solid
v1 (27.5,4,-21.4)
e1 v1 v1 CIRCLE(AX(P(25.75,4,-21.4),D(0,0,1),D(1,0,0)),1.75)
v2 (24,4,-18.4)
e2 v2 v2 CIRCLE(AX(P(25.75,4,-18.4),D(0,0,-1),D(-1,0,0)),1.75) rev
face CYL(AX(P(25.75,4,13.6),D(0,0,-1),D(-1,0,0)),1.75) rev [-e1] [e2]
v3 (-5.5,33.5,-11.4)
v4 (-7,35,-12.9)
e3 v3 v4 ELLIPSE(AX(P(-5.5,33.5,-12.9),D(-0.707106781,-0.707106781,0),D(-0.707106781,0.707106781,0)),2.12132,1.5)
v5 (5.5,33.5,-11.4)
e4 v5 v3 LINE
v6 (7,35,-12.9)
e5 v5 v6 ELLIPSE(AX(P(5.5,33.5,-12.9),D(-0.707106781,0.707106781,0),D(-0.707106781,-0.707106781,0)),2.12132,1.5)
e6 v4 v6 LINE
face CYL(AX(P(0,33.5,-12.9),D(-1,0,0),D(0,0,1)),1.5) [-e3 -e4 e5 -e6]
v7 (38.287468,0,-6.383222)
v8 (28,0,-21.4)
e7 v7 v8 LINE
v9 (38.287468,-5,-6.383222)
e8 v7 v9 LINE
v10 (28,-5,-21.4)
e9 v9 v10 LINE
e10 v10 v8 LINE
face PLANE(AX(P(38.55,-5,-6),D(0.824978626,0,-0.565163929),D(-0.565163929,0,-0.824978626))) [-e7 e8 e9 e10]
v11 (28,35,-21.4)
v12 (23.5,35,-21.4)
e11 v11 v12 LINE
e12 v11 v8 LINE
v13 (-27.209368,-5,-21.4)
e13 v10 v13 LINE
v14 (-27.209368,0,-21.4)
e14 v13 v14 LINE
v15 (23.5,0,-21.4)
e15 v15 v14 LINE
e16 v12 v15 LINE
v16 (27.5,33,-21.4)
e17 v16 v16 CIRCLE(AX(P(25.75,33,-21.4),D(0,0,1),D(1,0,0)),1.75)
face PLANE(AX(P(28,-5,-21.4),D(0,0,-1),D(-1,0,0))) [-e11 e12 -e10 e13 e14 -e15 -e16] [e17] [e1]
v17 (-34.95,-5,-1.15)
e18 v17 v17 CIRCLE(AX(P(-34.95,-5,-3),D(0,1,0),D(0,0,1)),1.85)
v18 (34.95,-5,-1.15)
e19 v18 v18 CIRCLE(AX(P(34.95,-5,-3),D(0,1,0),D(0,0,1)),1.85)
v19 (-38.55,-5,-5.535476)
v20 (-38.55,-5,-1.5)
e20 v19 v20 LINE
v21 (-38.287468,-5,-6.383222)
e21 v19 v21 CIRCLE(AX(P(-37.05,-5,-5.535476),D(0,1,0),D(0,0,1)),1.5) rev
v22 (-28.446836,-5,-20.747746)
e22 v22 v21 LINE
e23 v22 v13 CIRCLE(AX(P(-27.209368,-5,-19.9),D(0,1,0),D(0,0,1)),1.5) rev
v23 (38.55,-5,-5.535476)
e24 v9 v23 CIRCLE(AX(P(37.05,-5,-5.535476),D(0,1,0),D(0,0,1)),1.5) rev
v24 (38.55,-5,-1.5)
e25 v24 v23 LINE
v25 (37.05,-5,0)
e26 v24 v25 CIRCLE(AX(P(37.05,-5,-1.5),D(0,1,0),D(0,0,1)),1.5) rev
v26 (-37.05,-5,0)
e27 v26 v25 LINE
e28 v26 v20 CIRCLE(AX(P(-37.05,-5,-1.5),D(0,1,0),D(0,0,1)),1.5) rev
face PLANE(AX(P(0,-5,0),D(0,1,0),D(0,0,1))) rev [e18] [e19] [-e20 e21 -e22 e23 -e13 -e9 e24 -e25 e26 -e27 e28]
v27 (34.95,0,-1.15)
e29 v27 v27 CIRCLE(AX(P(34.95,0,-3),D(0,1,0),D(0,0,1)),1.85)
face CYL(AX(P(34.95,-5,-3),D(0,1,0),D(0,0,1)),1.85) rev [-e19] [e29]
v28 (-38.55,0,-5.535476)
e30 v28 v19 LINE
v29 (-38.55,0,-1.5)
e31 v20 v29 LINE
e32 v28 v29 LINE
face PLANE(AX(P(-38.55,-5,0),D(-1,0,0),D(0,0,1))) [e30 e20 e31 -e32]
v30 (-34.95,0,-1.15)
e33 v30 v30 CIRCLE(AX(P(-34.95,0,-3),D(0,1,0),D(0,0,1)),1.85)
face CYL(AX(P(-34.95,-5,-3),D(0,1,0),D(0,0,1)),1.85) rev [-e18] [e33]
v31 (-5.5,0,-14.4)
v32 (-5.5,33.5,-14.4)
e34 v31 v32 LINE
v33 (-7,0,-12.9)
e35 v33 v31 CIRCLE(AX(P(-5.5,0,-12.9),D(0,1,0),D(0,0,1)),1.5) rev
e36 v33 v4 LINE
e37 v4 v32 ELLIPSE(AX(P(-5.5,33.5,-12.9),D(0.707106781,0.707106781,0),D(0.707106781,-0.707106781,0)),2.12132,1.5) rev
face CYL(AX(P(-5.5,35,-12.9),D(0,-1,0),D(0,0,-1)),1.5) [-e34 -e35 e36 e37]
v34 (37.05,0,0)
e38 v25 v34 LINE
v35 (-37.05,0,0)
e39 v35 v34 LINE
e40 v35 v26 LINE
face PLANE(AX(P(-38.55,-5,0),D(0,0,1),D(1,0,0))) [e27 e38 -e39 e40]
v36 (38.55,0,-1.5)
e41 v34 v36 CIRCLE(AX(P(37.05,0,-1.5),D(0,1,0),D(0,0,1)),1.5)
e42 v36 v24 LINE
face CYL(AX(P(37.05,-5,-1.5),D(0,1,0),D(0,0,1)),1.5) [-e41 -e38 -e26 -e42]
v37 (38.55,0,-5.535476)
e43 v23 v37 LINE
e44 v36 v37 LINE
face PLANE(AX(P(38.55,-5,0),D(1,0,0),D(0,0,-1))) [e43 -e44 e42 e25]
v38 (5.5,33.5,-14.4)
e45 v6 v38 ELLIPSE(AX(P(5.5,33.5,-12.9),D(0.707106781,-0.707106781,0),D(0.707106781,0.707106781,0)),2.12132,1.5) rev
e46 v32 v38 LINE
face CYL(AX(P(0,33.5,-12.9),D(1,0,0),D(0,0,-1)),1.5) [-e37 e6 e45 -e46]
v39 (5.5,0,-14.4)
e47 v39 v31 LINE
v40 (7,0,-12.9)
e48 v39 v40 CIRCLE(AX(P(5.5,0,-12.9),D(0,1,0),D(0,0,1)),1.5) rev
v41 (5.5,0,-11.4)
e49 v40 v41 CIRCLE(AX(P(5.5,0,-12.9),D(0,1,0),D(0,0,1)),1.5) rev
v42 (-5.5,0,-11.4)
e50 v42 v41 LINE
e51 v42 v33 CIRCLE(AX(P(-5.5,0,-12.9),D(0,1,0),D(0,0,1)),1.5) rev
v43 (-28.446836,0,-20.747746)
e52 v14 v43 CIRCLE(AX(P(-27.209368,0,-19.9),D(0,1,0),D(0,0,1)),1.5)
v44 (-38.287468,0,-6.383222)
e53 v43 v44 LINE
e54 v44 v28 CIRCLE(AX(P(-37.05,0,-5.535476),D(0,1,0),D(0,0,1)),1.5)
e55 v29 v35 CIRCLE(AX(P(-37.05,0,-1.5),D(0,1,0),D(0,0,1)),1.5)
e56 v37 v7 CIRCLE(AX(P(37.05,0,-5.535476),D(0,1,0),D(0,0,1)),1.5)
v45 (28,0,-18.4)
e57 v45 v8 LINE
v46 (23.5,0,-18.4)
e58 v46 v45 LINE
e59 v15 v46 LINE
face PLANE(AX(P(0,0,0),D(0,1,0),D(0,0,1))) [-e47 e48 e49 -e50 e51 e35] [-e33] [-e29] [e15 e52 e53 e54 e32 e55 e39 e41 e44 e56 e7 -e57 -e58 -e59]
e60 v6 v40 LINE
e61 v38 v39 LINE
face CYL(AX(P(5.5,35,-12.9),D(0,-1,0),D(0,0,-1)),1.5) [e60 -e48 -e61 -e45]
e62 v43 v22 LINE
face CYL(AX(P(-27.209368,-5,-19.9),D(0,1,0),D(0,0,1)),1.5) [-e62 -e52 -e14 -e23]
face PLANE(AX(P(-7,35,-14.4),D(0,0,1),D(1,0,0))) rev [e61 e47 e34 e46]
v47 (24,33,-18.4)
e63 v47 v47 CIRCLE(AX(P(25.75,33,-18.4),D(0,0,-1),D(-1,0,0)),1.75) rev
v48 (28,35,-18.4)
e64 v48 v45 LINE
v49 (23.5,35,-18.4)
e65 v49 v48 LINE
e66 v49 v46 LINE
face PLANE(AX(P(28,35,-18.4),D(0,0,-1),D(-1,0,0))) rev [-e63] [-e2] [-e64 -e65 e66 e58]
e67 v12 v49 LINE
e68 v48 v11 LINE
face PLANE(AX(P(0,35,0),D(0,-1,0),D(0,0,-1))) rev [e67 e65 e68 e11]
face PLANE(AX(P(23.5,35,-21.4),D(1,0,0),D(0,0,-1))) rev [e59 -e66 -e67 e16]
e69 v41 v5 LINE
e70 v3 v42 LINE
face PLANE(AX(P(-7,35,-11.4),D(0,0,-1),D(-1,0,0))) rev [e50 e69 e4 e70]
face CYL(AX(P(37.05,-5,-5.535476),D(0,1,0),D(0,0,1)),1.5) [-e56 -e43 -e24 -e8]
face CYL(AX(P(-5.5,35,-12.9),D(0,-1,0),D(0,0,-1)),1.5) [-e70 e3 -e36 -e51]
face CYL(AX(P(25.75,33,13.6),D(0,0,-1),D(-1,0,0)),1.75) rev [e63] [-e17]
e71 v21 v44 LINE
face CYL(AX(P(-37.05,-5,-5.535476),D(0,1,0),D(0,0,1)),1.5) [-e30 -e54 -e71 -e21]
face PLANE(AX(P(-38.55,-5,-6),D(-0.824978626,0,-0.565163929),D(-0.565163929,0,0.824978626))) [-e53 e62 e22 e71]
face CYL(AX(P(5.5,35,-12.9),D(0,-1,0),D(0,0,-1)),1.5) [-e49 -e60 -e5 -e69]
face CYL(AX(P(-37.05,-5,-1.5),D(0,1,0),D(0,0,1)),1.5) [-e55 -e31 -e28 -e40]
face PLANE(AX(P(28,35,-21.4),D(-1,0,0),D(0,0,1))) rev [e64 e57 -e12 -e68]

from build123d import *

# Parameters (mm, degrees)
SKETCH_1_R          = 1.85
EXTRUDE_1_DEPTH     = 5
SKETCH_2_W          = 4.5
SKETCH_2_H          = 3
SKETCH_2_W_2        = 14
EXTRUDE_2_DEPTH     = 35
SKETCH_4_R          = 1.75
CUT_EXTRUDE_2_DEPTH = 35
FILLET_3_R          = 1.5
FILLET_4_R          = 1.5


with BuildPart() as part:
    # 草图1 → 凸台-拉伸1 (new body)
    with BuildSketch(Plane(origin=(0, 0, 0), x_dir=(1, 0, 0), z_dir=(0, 1, 0))):
        Polygon((-38.55, 0), (38.55, 0), (38.55, 6), (28, 21.4), (-28, 21.4), (-38.55, 6), align=None)
        with Locations(Location((-34.95, 3, 0), (0, 0, 270))):
            Circle(SKETCH_1_R, mode=Mode.SUBTRACT)
        with Locations(Location((34.95, 3, 0), (0, 0, 270))):
            Circle(SKETCH_1_R, mode=Mode.SUBTRACT)
    extrude(amount=-EXTRUDE_1_DEPTH)

    # 草图2 → 凸台-拉伸2 (add)
    with BuildSketch(Plane(origin=(0, 0, 0), x_dir=(1, 0, 0), z_dir=(0, 1, 0))):
        with Locations((25.75, 19.9)):
            Rectangle(SKETCH_2_W, SKETCH_2_H)
        with Locations((0, 12.9)):
            Rectangle(SKETCH_2_W_2, SKETCH_2_H)
    extrude(amount=EXTRUDE_2_DEPTH)

    # 草图4 → 切除-拉伸2 (cut)
    with BuildSketch(Plane.XY.offset(-21.4)):
        with Locations(Location((25.75, 33, 0), (0, 0, 180))):
            Circle(SKETCH_4_R)
        with Locations(Location((25.75, 4, 0), (0, 0, 180))):
            Circle(SKETCH_4_R)
    extrude(amount=CUT_EXTRUDE_2_DEPTH, mode=Mode.SUBTRACT)

    # 圆角3
    fillet_3_edges = [part.edges().sort_by_distance(p)[0] for p in [
        (-7, 17.5, -14.4),
        (-7, 17.5, -11.4),
        (7, 17.5, -14.4),
        (7, 17.5, -11.4),
        (0, 35, -11.4),
        (0, 35, -14.4),
    ]]
    fillet(fillet_3_edges, radius=FILLET_3_R - 0.0001)  # a hair under: the kernel refuses the full size

    # 圆角4
    fillet_4_edges = [part.edges().sort_by_distance(p)[0] for p in [
        (-38.55, -2.5, -6),
        (-28, -2.5, -21.4),
        (38.55, -2.5, -6),
        (38.55, -2.5, 0),
        (-38.55, -2.5, 0),
    ]]
    fillet(fillet_4_edges, radius=FILLET_4_R)


solid = part.part
